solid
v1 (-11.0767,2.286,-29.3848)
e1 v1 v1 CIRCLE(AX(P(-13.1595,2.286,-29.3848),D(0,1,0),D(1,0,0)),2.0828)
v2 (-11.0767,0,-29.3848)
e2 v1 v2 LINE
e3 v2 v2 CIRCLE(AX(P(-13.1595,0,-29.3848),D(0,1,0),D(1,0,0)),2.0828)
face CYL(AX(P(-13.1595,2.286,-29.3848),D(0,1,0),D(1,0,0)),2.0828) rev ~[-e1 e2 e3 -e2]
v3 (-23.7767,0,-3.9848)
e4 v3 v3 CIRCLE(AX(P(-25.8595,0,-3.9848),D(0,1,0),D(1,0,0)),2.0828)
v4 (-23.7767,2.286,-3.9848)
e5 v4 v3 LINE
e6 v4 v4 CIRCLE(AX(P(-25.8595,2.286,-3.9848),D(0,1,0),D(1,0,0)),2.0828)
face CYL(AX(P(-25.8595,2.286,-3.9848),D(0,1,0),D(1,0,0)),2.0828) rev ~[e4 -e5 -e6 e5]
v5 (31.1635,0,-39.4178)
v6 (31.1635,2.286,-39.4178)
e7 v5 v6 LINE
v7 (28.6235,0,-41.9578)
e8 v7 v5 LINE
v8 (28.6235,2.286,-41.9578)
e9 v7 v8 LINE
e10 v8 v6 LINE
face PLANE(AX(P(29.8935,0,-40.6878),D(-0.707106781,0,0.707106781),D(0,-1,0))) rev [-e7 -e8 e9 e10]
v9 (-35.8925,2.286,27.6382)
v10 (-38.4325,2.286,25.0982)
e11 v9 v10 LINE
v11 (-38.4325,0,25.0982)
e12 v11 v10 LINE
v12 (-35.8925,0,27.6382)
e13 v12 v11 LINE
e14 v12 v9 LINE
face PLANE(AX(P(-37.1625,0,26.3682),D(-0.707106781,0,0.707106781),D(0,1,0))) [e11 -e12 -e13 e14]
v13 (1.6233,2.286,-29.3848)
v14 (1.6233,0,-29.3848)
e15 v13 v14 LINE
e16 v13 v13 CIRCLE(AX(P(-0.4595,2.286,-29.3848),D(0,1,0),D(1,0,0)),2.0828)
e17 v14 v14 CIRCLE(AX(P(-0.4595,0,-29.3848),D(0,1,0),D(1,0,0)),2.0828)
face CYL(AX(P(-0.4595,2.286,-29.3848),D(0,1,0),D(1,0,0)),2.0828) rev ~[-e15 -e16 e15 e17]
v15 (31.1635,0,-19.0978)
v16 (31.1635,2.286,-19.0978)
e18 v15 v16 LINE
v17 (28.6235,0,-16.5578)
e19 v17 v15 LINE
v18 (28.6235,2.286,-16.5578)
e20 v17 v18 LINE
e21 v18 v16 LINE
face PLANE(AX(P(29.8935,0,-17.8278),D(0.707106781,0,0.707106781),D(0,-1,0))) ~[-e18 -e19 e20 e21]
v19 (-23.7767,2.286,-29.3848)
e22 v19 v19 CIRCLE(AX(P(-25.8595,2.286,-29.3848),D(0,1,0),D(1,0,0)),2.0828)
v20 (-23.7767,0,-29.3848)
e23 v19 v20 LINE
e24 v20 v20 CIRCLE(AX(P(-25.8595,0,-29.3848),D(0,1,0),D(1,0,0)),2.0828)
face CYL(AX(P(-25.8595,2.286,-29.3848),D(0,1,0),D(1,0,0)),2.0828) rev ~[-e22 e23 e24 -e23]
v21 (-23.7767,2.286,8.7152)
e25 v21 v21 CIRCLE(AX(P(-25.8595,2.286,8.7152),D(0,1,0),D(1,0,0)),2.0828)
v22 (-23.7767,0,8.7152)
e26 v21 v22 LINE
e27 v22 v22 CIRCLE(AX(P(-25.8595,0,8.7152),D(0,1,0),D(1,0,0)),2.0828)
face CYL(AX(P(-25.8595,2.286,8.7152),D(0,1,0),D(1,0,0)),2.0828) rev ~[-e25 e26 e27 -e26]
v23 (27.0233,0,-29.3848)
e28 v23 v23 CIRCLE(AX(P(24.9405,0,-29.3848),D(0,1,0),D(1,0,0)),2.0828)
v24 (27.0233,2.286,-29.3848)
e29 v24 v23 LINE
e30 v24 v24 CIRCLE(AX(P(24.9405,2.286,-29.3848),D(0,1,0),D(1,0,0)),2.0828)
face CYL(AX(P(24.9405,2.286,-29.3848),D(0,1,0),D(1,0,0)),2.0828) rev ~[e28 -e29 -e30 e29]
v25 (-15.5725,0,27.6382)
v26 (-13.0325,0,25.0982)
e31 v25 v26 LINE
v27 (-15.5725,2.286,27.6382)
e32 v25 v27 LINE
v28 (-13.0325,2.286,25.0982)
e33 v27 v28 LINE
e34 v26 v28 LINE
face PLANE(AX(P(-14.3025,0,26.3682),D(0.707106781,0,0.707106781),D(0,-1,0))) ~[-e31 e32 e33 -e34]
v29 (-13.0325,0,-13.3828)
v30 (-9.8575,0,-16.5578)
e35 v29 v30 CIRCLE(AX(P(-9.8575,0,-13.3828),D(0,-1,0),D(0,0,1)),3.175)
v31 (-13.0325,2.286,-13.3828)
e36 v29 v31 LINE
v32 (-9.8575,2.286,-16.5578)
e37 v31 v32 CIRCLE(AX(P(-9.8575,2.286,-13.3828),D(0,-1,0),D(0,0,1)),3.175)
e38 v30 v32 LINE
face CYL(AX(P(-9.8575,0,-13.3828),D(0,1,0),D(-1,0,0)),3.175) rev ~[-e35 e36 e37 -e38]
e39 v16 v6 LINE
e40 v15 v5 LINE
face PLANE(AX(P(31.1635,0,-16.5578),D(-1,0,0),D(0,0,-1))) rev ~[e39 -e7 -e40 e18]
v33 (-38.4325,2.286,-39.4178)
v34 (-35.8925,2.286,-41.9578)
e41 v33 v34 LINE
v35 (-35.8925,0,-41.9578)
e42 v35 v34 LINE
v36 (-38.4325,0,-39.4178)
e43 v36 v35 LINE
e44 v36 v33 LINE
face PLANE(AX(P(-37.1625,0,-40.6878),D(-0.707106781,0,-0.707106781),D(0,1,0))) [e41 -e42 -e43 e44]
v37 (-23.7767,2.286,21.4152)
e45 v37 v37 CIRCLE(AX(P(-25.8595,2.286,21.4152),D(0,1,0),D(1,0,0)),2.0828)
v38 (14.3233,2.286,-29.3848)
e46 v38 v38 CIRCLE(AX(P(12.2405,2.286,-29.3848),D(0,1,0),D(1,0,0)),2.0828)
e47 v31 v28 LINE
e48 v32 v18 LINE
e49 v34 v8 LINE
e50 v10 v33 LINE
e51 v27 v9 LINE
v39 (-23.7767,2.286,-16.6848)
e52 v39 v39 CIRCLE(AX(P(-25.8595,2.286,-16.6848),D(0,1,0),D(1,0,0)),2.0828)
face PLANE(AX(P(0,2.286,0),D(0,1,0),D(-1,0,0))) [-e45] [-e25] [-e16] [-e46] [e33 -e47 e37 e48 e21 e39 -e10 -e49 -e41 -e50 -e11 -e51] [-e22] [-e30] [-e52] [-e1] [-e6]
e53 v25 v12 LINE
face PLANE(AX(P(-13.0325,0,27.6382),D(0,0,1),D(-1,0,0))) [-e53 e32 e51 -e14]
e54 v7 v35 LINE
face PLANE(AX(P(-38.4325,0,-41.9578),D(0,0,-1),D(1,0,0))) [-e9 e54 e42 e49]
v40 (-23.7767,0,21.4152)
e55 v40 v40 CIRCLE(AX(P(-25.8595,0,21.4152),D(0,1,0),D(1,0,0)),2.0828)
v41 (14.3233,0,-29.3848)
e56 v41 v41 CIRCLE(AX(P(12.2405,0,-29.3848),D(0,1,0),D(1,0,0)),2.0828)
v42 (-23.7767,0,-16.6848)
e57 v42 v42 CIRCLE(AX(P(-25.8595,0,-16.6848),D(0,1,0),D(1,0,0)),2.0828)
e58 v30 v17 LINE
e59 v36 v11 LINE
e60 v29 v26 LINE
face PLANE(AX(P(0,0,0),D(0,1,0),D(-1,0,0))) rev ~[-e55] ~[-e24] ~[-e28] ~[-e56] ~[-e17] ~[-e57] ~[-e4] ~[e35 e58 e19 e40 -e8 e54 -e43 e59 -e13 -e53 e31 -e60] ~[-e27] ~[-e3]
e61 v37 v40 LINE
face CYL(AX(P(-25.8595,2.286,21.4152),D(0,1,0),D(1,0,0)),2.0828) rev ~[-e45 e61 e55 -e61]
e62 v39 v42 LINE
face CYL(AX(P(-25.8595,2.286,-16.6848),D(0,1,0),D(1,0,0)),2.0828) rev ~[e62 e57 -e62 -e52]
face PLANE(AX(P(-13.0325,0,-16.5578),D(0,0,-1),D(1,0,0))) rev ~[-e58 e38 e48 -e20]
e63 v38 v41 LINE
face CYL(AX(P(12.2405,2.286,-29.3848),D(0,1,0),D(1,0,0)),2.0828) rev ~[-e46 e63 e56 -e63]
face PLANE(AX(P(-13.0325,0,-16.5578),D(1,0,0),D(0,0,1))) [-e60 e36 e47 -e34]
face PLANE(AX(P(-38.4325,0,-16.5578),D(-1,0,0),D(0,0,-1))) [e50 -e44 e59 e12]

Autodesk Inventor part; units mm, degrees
ref_plane "YZ Plane" through (0, 0, 0) normal (1, 0, 0) x (0, 1, 0)
ref_plane "XZ Plane" through (0, 0, 0) normal (0, 1, 0) x (-1, 0, 0)
ref_plane "XY Plane" through (0, 0, 0) normal (0, 0, 1) x (1, 0, 0)
sketch "Sketch1" plane through (0, 0, 0) normal (0, 1, 0) x (-1, 0, 0)
  line L0 (38.4325, -41.9578) -> (13.0325, -41.9578)
  line L1 (13.0325, -41.9578) -> (13.0325, 27.6382)
  line L2 (13.0325, 27.6382) -> (38.4325, 27.6382)
  line L3 (38.4325, 27.6382) -> (38.4325, -41.9578)
  line L4 (38.4325, -41.9578) -> (-9.6784, 6.153) construction
  line L5 (38.4325, -41.9578) -> (38.4325, -16.5578)
  line L6 (38.4325, -16.5578) -> (-31.1635, -16.5578)
  line L7 (-31.1635, -16.5578) -> (-31.1635, -41.9578)
  line L8 (-31.1635, -41.9578) -> (38.4325, -41.9578)
  point P0 (0, 0)
  point P1 (13.0325, -16.5578)
  dimension "d0" = 25.4
  dimension "d1" = 69.596
  dimension "d2" = 45
extrude "Extrusion1" add sketch "Sketch1" along normal blind 2.286
chamfer "Chamfer1" distance 2.54 angle 45 1 edges at (-13.0325, 1.143, 27.6382)
chamfer "Chamfer2" distance 2.54 angle 45 4 edges at (-38.4325, 1.143, 27.6382) (31.1635, 1.143, -16.5578) (31.1635, 1.143, -41.9578) (-38.4325, 1.143, -41.9578)
fillet "Fillet1" radius 3.175 1 edges at (-13.0325, 1.143, -16.5578)
sketch "Sketch2" plane through (0, 2.286, 0) normal (0, 1, 0) x (1, 0, 0)
  circle A0 centre (-25.8595, 29.3848) radius 2.0828
  line L0 (28.6235, 41.9578) -> (-35.8925, 41.9578) projected
  line L1 (31.1635, 19.0978) -> (31.1635, 39.4178) projected
  point P0 (0, 0)
  dimension "d12" = 12.573
  dimension "d13" = 57.023
  dimension "d14" = 4.1656
extrude "Extrusion2" cut sketch "Sketch2" against normal blind 2.286
pattern_linear "Rectangular Pattern1" count 5 spacing 12.7 along (0, 0, 1) of "Extrusion2"
pattern_linear "Rectangular Pattern2" count 5 spacing 12.7 along (1, 0, 0) of "Extrusion2"
properties part number "VersaGusset 90o"
